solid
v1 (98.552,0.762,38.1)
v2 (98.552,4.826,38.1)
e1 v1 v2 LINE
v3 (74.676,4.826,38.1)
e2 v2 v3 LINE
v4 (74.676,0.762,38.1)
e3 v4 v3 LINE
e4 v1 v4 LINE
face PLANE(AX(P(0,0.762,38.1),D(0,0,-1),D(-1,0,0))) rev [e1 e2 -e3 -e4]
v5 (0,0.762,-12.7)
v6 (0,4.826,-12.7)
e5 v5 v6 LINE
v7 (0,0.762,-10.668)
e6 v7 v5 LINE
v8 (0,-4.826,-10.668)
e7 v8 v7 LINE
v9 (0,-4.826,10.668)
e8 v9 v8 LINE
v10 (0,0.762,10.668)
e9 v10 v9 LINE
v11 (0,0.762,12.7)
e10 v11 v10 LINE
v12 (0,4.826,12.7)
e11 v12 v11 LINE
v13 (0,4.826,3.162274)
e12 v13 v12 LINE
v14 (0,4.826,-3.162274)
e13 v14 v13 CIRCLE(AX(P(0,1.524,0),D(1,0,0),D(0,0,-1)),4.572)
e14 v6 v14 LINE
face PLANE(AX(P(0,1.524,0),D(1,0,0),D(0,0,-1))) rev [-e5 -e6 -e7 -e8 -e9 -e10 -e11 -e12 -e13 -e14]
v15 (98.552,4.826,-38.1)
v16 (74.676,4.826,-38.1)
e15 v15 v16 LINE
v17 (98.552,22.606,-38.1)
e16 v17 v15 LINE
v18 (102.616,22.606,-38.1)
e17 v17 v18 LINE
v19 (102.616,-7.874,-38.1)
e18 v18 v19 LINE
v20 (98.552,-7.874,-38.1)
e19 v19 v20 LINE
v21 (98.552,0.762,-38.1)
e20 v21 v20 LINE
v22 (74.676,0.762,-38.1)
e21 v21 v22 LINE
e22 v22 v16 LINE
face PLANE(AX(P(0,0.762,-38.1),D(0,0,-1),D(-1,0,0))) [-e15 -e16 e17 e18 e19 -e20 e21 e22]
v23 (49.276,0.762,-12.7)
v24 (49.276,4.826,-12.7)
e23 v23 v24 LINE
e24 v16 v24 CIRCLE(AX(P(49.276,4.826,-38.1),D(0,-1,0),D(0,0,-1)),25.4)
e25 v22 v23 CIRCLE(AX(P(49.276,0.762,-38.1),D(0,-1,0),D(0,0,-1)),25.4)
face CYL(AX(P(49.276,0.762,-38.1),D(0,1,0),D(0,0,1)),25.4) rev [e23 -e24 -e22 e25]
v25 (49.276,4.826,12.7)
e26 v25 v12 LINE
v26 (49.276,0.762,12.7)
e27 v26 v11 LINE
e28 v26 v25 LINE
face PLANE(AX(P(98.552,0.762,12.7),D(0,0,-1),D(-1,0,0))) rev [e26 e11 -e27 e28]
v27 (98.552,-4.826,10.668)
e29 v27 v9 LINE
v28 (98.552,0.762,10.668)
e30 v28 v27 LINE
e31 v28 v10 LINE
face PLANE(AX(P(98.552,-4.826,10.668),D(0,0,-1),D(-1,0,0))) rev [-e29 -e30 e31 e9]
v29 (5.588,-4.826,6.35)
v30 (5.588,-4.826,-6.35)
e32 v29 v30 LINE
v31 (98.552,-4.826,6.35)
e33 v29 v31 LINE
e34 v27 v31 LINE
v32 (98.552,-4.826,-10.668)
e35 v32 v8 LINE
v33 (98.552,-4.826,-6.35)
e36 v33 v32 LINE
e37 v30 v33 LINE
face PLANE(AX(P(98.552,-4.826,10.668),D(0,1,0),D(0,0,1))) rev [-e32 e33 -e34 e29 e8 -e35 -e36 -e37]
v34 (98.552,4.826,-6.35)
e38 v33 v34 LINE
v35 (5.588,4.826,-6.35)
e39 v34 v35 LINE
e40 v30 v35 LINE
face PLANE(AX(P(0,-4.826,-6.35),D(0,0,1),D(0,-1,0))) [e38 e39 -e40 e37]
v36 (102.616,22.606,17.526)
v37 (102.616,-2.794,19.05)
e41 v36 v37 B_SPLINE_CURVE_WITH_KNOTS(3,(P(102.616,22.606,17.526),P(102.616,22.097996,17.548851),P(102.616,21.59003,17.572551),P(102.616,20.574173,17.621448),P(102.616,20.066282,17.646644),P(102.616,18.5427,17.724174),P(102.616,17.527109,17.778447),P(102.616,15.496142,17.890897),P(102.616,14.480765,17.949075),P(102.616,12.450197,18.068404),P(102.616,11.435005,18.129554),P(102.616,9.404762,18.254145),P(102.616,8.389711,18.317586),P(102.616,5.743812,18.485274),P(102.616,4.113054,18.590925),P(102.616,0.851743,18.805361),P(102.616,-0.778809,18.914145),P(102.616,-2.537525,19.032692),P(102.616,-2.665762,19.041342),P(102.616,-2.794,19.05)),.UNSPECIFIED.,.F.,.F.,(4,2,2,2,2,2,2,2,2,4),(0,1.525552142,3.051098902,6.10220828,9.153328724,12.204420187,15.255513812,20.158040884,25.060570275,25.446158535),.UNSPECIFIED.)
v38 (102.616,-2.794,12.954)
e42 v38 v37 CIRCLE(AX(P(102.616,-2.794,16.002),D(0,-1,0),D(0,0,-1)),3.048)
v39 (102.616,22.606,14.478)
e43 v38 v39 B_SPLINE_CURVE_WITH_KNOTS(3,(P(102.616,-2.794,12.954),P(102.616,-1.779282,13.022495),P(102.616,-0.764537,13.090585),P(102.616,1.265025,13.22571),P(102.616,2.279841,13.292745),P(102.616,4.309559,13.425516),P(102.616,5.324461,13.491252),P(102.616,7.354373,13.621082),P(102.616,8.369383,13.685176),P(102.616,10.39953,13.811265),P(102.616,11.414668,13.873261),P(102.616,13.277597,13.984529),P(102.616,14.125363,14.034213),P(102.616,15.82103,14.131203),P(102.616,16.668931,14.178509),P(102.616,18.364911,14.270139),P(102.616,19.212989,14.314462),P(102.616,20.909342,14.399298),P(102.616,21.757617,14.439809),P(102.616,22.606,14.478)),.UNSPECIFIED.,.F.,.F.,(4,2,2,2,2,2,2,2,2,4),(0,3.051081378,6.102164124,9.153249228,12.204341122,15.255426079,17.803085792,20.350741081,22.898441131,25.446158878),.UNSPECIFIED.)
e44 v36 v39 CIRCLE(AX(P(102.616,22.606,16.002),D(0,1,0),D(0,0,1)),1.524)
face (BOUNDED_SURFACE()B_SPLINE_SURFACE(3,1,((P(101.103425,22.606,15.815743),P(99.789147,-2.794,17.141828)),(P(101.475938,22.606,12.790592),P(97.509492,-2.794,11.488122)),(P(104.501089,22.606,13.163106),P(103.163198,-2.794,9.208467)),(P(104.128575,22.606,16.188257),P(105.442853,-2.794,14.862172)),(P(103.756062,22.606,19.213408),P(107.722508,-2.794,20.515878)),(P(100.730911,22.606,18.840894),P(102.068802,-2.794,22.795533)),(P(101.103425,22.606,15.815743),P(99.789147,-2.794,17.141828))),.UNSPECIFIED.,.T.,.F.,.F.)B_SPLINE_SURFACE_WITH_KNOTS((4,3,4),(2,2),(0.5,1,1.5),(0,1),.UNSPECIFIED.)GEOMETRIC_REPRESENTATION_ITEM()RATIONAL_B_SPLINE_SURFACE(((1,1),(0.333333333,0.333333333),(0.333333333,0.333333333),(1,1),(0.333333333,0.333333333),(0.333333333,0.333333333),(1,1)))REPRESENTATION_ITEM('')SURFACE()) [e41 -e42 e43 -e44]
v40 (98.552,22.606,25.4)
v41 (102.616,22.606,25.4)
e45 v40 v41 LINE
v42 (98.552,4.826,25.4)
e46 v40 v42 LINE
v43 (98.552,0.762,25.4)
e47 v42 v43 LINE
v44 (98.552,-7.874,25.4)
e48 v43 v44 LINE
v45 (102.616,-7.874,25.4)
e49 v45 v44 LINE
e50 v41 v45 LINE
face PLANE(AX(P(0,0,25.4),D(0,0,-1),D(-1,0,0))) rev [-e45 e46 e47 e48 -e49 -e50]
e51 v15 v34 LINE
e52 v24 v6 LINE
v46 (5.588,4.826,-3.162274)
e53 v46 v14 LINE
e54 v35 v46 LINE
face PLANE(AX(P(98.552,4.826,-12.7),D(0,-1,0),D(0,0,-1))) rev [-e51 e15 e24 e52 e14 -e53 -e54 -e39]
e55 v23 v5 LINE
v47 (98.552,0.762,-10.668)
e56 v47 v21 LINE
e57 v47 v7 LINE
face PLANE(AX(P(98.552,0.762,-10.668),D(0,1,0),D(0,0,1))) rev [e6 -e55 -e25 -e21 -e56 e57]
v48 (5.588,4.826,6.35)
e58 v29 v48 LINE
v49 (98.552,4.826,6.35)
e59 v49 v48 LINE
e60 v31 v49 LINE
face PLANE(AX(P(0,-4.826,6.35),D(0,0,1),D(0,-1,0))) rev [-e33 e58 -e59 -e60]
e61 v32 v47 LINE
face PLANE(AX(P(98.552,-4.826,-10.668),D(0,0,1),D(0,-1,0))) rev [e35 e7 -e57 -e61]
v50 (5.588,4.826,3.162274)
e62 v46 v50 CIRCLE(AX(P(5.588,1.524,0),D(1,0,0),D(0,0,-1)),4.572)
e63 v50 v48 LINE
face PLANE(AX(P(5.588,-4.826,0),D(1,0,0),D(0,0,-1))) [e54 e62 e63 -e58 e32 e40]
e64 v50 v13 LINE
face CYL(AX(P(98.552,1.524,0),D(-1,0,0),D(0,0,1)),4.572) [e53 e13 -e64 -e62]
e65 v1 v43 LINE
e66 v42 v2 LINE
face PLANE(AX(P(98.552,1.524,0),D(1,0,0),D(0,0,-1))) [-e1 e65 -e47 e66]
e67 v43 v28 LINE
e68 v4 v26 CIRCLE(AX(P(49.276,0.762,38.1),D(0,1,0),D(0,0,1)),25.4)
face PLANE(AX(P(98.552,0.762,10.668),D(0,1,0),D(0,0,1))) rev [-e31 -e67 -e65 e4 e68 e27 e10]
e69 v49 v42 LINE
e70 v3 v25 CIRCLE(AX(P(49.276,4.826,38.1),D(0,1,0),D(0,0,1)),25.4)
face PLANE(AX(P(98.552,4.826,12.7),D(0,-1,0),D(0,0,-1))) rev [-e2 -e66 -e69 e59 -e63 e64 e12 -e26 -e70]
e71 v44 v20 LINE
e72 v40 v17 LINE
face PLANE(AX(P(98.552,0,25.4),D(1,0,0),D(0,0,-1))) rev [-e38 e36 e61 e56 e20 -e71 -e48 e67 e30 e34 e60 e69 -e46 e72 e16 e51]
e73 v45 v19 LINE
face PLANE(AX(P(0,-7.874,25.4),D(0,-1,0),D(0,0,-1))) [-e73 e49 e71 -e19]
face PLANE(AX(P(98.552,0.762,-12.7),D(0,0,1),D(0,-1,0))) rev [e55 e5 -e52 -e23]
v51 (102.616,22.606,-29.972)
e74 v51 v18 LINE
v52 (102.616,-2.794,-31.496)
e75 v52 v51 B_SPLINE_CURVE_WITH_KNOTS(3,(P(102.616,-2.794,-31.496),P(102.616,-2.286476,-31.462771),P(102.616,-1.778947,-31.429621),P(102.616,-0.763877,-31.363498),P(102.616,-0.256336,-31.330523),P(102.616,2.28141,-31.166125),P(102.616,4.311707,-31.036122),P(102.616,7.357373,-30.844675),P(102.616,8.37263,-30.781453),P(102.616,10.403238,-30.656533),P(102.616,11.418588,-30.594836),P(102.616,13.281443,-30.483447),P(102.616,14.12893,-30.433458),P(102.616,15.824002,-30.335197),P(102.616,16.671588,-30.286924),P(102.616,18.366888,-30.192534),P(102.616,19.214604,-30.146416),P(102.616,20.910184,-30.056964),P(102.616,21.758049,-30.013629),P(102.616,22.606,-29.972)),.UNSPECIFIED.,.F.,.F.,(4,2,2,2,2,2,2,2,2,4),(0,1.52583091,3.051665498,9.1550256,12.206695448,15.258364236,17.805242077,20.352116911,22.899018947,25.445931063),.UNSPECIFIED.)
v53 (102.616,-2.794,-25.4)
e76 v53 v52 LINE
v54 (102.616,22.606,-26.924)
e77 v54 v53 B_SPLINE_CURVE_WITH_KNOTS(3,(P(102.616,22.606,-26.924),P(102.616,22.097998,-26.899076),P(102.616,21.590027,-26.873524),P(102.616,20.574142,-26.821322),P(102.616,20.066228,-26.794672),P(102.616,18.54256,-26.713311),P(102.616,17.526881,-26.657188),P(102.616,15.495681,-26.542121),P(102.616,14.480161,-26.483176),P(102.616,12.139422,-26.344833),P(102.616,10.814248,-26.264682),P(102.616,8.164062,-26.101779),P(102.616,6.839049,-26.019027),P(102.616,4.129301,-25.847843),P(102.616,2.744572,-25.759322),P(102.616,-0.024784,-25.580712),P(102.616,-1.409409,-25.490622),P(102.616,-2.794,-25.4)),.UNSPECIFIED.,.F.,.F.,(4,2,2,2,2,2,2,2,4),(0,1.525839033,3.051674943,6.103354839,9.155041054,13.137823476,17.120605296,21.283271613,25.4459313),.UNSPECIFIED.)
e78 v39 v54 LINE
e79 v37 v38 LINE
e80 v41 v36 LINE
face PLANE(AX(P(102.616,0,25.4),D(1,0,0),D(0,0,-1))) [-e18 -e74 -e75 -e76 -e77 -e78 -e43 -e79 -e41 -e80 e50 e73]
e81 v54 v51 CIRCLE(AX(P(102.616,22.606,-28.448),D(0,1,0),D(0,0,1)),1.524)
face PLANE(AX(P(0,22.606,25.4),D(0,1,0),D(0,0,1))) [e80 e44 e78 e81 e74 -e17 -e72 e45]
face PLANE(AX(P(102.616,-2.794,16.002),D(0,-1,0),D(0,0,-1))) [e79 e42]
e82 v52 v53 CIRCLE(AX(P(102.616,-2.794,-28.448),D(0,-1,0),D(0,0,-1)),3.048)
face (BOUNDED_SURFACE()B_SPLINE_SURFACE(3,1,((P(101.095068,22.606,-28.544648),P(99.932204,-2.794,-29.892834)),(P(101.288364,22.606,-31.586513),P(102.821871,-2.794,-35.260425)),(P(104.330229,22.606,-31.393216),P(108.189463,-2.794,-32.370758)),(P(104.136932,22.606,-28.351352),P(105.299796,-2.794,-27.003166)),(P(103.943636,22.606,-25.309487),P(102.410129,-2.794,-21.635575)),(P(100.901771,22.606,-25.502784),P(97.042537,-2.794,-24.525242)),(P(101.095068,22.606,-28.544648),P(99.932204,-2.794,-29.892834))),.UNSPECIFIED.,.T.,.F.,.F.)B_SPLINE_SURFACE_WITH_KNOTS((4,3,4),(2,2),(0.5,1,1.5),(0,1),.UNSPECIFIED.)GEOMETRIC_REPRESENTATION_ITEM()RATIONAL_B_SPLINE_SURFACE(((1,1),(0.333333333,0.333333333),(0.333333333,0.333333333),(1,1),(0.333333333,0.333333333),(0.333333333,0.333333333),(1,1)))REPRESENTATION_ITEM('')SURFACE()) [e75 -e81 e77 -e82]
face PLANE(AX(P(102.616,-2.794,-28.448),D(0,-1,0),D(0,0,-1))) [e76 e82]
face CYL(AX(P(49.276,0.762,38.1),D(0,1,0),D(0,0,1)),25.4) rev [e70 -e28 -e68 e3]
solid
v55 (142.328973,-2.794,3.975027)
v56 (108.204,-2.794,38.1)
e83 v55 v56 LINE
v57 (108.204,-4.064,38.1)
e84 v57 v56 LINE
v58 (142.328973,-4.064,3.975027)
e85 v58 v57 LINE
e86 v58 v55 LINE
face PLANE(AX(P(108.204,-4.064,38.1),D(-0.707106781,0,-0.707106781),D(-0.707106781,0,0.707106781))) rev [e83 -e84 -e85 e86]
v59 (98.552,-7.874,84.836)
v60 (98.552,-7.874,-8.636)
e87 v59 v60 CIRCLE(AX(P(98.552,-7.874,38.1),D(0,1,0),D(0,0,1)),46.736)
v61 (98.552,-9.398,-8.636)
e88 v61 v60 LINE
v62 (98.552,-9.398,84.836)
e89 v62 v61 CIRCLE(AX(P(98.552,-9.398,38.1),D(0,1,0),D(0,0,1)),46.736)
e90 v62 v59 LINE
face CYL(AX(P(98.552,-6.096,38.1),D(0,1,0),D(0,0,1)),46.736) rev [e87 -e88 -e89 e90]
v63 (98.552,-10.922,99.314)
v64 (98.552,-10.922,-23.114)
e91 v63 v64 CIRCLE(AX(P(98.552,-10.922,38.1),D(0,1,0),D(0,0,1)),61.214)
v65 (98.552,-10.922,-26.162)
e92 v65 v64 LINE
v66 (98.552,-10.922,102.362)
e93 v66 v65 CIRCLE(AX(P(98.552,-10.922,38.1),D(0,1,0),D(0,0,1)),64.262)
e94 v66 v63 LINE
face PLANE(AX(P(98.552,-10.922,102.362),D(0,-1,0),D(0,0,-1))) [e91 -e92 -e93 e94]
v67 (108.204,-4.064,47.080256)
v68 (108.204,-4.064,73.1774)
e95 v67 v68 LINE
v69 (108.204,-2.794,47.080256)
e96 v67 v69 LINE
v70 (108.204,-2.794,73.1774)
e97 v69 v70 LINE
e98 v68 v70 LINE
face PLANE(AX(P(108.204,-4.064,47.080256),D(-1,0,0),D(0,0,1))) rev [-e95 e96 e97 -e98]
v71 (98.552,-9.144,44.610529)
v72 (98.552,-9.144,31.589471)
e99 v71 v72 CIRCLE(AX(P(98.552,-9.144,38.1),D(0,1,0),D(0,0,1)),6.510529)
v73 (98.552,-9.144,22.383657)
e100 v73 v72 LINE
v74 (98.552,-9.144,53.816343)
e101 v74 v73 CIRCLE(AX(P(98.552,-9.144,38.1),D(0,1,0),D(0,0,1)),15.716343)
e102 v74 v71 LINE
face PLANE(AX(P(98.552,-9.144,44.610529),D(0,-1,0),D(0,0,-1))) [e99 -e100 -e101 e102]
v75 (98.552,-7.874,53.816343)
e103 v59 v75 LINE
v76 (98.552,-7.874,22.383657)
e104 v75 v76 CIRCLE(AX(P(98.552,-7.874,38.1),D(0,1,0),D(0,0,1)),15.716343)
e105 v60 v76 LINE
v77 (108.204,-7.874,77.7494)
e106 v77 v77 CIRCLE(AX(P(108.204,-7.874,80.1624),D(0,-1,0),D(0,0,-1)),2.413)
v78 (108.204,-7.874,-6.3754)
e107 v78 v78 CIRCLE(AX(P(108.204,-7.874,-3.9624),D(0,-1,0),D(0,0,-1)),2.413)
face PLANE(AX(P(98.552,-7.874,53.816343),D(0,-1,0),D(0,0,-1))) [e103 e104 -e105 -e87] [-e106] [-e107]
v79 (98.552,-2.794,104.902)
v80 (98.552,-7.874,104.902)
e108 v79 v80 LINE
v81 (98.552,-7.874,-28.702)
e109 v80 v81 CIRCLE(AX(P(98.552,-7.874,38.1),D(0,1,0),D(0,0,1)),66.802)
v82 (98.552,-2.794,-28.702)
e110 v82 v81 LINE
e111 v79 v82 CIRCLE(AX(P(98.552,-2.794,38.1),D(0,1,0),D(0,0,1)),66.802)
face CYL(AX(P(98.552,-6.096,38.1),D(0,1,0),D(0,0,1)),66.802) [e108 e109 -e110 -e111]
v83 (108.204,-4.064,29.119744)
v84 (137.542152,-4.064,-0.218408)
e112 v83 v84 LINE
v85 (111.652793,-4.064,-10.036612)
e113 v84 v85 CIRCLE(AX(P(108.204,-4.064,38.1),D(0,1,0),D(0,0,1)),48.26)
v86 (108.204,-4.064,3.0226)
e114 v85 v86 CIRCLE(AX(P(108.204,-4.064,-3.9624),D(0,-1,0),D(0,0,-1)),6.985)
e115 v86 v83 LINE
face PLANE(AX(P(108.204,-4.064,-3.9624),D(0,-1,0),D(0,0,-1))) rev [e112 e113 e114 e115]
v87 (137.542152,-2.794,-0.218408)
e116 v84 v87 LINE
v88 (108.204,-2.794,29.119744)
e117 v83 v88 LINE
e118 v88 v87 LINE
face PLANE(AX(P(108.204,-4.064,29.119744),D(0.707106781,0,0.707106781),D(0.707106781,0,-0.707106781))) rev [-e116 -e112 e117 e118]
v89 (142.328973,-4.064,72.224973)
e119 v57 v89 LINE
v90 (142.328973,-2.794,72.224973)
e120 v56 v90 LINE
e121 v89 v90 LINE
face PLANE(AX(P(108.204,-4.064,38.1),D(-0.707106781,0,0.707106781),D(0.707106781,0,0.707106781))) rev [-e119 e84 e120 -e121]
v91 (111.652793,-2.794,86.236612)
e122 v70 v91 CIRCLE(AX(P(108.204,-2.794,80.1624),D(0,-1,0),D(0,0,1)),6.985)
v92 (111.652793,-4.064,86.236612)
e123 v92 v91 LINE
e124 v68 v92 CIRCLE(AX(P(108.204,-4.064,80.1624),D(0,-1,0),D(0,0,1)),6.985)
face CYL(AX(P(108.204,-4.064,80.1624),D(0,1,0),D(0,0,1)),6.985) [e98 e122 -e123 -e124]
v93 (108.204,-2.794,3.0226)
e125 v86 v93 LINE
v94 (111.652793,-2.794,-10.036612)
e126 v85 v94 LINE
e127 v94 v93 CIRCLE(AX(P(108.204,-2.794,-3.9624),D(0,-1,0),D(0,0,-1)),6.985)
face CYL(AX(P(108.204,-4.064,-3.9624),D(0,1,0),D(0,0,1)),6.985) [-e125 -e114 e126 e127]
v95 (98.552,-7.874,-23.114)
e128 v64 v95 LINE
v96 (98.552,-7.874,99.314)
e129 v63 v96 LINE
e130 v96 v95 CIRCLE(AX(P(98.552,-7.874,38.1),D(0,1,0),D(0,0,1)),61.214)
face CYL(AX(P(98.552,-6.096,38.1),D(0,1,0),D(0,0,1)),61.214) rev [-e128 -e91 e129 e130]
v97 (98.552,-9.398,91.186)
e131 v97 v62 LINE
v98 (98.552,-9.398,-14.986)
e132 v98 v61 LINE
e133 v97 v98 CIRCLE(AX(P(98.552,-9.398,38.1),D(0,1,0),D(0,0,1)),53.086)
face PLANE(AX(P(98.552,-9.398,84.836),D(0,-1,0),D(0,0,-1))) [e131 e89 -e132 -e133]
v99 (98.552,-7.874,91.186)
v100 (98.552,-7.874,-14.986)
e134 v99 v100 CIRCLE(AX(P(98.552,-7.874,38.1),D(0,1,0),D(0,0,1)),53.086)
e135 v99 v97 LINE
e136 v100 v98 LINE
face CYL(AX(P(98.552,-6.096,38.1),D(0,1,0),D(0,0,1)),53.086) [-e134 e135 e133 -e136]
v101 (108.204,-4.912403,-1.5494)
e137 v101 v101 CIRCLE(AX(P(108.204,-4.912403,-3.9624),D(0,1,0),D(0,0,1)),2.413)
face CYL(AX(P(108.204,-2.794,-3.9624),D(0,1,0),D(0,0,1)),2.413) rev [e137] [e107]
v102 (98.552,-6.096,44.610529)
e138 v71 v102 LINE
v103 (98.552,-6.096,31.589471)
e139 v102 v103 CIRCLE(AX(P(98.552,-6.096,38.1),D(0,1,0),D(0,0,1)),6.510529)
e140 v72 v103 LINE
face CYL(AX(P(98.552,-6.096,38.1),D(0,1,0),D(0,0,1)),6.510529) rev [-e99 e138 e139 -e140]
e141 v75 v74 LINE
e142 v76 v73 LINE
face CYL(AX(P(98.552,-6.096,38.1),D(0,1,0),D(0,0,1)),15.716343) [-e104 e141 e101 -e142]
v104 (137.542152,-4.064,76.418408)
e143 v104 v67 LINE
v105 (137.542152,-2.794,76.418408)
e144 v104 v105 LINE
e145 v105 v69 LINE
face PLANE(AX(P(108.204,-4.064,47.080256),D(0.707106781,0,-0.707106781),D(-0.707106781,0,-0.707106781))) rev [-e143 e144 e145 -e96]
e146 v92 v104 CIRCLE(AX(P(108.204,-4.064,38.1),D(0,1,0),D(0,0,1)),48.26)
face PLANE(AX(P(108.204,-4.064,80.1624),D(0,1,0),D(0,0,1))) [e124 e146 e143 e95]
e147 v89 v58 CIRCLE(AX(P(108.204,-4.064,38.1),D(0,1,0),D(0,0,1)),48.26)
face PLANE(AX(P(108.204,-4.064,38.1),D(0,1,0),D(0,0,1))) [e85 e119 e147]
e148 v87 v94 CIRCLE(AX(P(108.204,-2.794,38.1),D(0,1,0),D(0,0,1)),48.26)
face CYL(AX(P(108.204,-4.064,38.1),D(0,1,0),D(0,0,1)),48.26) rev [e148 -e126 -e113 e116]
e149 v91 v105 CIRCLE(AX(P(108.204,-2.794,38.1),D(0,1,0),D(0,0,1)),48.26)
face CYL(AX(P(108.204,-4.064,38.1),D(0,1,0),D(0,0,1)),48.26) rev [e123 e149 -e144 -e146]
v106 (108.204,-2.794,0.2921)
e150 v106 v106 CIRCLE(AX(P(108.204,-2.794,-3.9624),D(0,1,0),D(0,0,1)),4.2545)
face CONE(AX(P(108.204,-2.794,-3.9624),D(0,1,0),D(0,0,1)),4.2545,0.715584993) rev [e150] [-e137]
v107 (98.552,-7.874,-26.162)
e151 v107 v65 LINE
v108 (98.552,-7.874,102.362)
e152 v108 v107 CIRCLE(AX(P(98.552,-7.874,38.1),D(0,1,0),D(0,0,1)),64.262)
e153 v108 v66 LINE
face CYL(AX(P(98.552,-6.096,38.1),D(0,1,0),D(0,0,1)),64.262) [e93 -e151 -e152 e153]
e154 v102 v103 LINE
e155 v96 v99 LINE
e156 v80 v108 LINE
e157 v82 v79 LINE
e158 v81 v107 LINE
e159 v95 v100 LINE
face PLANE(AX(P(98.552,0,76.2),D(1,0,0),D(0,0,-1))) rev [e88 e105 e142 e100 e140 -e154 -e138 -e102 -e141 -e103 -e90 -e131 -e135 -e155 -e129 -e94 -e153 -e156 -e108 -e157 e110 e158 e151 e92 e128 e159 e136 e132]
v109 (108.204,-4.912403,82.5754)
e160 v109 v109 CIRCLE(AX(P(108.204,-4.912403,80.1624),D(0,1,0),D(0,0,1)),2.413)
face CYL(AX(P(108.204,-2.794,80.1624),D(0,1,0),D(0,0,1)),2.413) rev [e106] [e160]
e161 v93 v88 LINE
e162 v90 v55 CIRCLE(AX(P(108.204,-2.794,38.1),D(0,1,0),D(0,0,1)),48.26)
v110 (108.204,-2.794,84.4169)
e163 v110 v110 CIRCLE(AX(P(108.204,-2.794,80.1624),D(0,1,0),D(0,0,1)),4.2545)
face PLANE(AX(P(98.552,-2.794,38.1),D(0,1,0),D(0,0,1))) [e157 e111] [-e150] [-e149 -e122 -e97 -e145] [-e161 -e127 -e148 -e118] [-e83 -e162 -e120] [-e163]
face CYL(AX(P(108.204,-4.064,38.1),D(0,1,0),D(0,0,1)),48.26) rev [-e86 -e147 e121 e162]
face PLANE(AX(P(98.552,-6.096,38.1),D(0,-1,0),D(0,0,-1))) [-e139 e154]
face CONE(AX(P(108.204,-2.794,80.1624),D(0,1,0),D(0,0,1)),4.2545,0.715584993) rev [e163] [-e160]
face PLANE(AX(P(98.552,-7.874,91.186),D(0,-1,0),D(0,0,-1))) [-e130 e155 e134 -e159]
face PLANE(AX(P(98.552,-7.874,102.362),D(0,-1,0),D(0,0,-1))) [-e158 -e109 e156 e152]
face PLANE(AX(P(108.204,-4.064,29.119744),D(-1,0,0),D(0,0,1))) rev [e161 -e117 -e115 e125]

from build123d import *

# Parameters (mm, degrees)
BOSS_EXTRUDE1_DEPTH                           = 98.552
CUT_EXTRUDE2_DEPTH                            = 100.834602258
CUT_EXTRUDE2_DEPTH_BACK                       = 100.834602258
SKETCH2_W                                     = 92.964
SKETCH2_H                                     = 3.187725502
BOSS_EXTRUDE2_START                           = -4.064
BOSS_EXTRUDE2_DEPTH                           = 4.064
SKETCH10_W                                    = 4.064
SKETCH10_H                                    = 8.636
BOSS_EXTRUDE3_DEPTH                           = 63.5
REVOLVE1_ANGLE                                = 180
CUT_EXTRUDE3_DEPTH                            = 1.27
CSK_FOR_1_FLAT_HEAD_SOCKET_CAP_SCREW1_A_COUNT = 2
CSK_FOR_1_FLAT_HEAD_SOCKET_CAP_SCREW1_A_PITCH = 84.1248


with BuildPart() as part:
    # Sketch1 → Boss-Extrude1 (new body)
    with BuildSketch(Plane(origin=(0, 0, 0), x_dir=(0, 0, -1), z_dir=(1, 0, 0))):
        with BuildLine():
            Line((-10.668, -4.826), (10.668, -4.826))
            Line((10.668, -4.826), (10.668, 0.762))
            Line((10.668, 0.762), (12.7, 0.762))
            Line((12.7, 0.762), (12.7, 4.826))
            Line((12.7, 4.826), (3.162274498, 4.826))
            ThreePointArc((3.162274498, 4.826), (0, 6.096), (-3.162274498, 4.826))
            Line((-3.162274498, 4.826), (-12.7, 4.826))
            Line((-12.7, 4.826), (-12.7, 0.762))
            Line((-12.7, 0.762), (-10.668, 0.762))
            Line((-10.668, 0.762), (-10.668, -4.826))
        make_face()
    extrude(amount=BOSS_EXTRUDE1_DEPTH)

    # Sketch2 → Cut-Extrude2 (cut, two sides: drawn at the far end of the back side and taken through both)
    with BuildSketch(Plane(origin=(0, 4.826, 0), x_dir=(1, 0, 0), z_dir=(0, 1, 0)).offset(-CUT_EXTRUDE2_DEPTH_BACK)):
        with Locations((52.07, -4.756137249)):
            Rectangle(SKETCH2_W, SKETCH2_H)
        Polygon((5.588, 6.35), (5.588, 0), (5.588, -3.162274498), (98.552, -3.162274498), (98.552, 6.35), align=None)
    extrude(amount=CUT_EXTRUDE2_DEPTH + CUT_EXTRUDE2_DEPTH_BACK, mode=Mode.SUBTRACT)

    # Sketch3 → Boss-Extrude2 (add)
    with BuildSketch(Plane(origin=(0, 4.826, 0), x_dir=(1, 0, 0), z_dir=(0, 1, 0)).offset(BOSS_EXTRUDE2_START)):
        with BuildLine():
            Line((98.552, -12.7), (49.276, -12.7))
            ThreePointArc((49.276, -12.7), (67.236512242, -20.139487758), (74.676, -38.1))
            Line((74.676, -38.1), (98.552, -38.1))
            Line((98.552, -38.1), (98.552, -12.7))
        make_face()
    boss_extrude2 = extrude(amount=BOSS_EXTRUDE2_DEPTH)

    # Mirror1: Boss-Extrude2 across plane
    add(boss_extrude2.mirror(Plane.XY))

    # Sketch10 → Boss-Extrude3 (add)
    with BuildSketch(Plane(origin=(0, 0, -38.1), x_dir=(-1, 0, 0), z_dir=(0, 0, -1))):
        Polygon((-102.616, 0.762), (-98.552, 0.762), (-98.552, 4.826), (-98.552, 22.606), (-102.616, 22.606), align=None)
        with Locations((-100.584, -3.556)):
            Rectangle(SKETCH10_W, SKETCH10_H)
    extrude(amount=-BOSS_EXTRUDE3_DEPTH)

    # Loft1: read off the stored shape, not the designer's step
    # Loft1: loft between two sections, ruled curve by curve
    loft1_from = [
        Edge.make_bspline([(101.095067692, 22.606, -28.544648401), (101.288364493, 22.606, -31.586513017), (104.33022911, 22.606, -31.393216216), (104.136932308, 22.606, -28.351351599), (103.943635507, 22.606, -25.309486983), (100.90177089, 22.606, -25.502783784), (101.095067692, 22.606, -28.544648401)], [0.5, 0.5, 0.5, 0.5, 1, 1, 1, 1.5, 1.5, 1.5, 1.5], 3, [1, 0.333333333, 0.333333333, 1, 0.333333333, 0.333333333, 1]),
    ]
    loft1_to = [
        Edge.make_bspline([(99.932204152, -2.794, -29.8928335), (102.821871152, -2.794, -35.260425197), (108.189462849, -2.794, -32.370758196), (105.299795848, -2.794, -27.0031665), (102.410128848, -2.794, -21.635574803), (97.042537151, -2.794, -24.525241804), (99.932204152, -2.794, -29.8928335)], [0.5, 0.5, 0.5, 0.5, 1, 1, 1, 1.5, 1.5, 1.5, 1.5], 3, [1, 0.333333333, 0.333333333, 1, 0.333333333, 0.333333333, 1]),
    ]
    loft1 = Solid(Shell([*[Face.make_surface_from_curves(loft1_from[k], loft1_to[k]) for k in range(1)], Face(Wire(loft1_from)), Face(Wire(loft1_to))]))
    add(loft1)

    # Loft2: read off the stored shape, not the designer's step
    # Loft2: loft between two sections, ruled curve by curve
    loft2_from = [
        Edge.make_bspline([(101.103424589, 22.606, 15.815743121), (101.475938347, 22.606, 12.790592298), (104.50108917, 22.606, 13.163106056), (104.128575411, 22.606, 16.188256879), (103.756061653, 22.606, 19.213407702), (100.73091083, 22.606, 18.840893944), (101.103424589, 22.606, 15.815743121)], [0.5, 0.5, 0.5, 0.5, 1, 1, 1, 1.5, 1.5, 1.5, 1.5], 3, [1, 0.333333333, 0.333333333, 1, 0.333333333, 0.333333333, 1]),
    ]
    loft2_to = [
        Edge.make_bspline([(99.789147173, -2.794, 17.141827659), (97.509491854, -2.794, 11.488122004), (103.163197509, -2.794, 9.208466686), (105.442852827, -2.794, 14.862172341), (107.722508146, -2.794, 20.515877996), (102.068802491, -2.794, 22.795533314), (99.789147173, -2.794, 17.141827659)], [0.5, 0.5, 0.5, 0.5, 1, 1, 1, 1.5, 1.5, 1.5, 1.5], 3, [1, 0.333333333, 0.333333333, 1, 0.333333333, 0.333333333, 1]),
    ]
    loft2 = Solid(Shell([*[Face.make_surface_from_curves(loft2_from[k], loft2_to[k]) for k in range(1)], Face(Wire(loft2_from)), Face(Wire(loft2_to))]))
    add(loft2)


with BuildPart() as body_2:
    # Sketch17 → Revolve1 (revolve)
    with BuildSketch(Plane.ZY.offset(-98.552)):
        Polygon((-26.162, -10.922), (-23.114, -10.922), (-23.114, -7.874), (-14.986, -7.874), (-14.986, -9.398), (-8.636, -9.398), (-8.636, -7.874), (22.383656596, -7.874), (22.383656596, -9.144), (31.589471145, -9.144), (31.589471145, -6.096), (38.1, -6.096), (38.1, -2.794), (-28.702, -2.794), (-28.702, -7.874), (-26.162, -7.874), align=None)
    revolve(axis=Axis((98.552, -6.096, 38.1), (0, -1, 0)), revolution_arc=REVOLVE1_ANGLE)

    # Sketch19 → Cut-Extrude3 (cut)
    with BuildSketch(Plane(origin=(0, -2.794, 0), x_dir=(1, 0, 0), z_dir=(0, 1, 0))):
        with BuildLine():
            Line((108.204, -38.1), (142.32897326, -72.22497326))
            ThreePointArc((142.32897326, -72.22497326), (156.464, -38.1), (142.32897326, -3.97502674))
            Line((142.32897326, -3.97502674), (108.204, -38.1))
        make_face()
        with BuildLine():
            Line((108.204, -47.080256121), (137.542152268, -76.418408389))
            ThreePointArc((137.542152268, -76.418408389), (125.316721094, -83.224077572), (111.652792819, -86.236612138))
            ThreePointArc((111.652792819, -86.236612138), (114.957465658, -78.378884761), (108.204, -73.1774))
            Line((108.204, -73.1774), (108.204, -47.080256121))
        make_face()
        with BuildLine():
            Line((108.204, -29.119743879), (137.542152268, 0.218408389))
            ThreePointArc((137.542152268, 0.218408389), (125.316721094, 7.024077572), (111.652792819, 10.036612138))
            ThreePointArc((111.652792819, 10.036612138), (114.957465658, 2.178884761), (108.204, -3.0226))
            Line((108.204, -3.0226), (108.204, -29.119743879))
        make_face()
    extrude(amount=-CUT_EXTRUDE3_DEPTH, mode=Mode.SUBTRACT)

    # Sketch21 → CSK for #1 Flat Head Socket Cap Screw1 (revolve, cut)
    with BuildSketch(Plane(origin=(108.204, -2.794, 80.1624), x_dir=(0, 0, 1), z_dir=(1, 0, 0))):
        Polygon((0, 0), (0, 8.128), (2.413, 8.128), (2.413, 2.118403422), (4.2545, 0), align=None)
    csk_for_1_flat_head_socket_cap_screw1 = revolve(axis=Axis((108.204, 3.556, 80.1624), (0, -1, 0)), mode=Mode.SUBTRACT)

    # CSK for #1 Flat Head Socket Cap Screw1 a: CSK for #1 Flat Head Socket Cap Screw1 ×2
    with Locations(*[(0, 0, -i * CSK_FOR_1_FLAT_HEAD_SOCKET_CAP_SCREW1_A_PITCH) for i in range(1, CSK_FOR_1_FLAT_HEAD_SOCKET_CAP_SCREW1_A_COUNT)]):
        add(csk_for_1_flat_head_socket_cap_screw1, mode=Mode.SUBTRACT)


solid = Compound([part.part, body_2.part])
